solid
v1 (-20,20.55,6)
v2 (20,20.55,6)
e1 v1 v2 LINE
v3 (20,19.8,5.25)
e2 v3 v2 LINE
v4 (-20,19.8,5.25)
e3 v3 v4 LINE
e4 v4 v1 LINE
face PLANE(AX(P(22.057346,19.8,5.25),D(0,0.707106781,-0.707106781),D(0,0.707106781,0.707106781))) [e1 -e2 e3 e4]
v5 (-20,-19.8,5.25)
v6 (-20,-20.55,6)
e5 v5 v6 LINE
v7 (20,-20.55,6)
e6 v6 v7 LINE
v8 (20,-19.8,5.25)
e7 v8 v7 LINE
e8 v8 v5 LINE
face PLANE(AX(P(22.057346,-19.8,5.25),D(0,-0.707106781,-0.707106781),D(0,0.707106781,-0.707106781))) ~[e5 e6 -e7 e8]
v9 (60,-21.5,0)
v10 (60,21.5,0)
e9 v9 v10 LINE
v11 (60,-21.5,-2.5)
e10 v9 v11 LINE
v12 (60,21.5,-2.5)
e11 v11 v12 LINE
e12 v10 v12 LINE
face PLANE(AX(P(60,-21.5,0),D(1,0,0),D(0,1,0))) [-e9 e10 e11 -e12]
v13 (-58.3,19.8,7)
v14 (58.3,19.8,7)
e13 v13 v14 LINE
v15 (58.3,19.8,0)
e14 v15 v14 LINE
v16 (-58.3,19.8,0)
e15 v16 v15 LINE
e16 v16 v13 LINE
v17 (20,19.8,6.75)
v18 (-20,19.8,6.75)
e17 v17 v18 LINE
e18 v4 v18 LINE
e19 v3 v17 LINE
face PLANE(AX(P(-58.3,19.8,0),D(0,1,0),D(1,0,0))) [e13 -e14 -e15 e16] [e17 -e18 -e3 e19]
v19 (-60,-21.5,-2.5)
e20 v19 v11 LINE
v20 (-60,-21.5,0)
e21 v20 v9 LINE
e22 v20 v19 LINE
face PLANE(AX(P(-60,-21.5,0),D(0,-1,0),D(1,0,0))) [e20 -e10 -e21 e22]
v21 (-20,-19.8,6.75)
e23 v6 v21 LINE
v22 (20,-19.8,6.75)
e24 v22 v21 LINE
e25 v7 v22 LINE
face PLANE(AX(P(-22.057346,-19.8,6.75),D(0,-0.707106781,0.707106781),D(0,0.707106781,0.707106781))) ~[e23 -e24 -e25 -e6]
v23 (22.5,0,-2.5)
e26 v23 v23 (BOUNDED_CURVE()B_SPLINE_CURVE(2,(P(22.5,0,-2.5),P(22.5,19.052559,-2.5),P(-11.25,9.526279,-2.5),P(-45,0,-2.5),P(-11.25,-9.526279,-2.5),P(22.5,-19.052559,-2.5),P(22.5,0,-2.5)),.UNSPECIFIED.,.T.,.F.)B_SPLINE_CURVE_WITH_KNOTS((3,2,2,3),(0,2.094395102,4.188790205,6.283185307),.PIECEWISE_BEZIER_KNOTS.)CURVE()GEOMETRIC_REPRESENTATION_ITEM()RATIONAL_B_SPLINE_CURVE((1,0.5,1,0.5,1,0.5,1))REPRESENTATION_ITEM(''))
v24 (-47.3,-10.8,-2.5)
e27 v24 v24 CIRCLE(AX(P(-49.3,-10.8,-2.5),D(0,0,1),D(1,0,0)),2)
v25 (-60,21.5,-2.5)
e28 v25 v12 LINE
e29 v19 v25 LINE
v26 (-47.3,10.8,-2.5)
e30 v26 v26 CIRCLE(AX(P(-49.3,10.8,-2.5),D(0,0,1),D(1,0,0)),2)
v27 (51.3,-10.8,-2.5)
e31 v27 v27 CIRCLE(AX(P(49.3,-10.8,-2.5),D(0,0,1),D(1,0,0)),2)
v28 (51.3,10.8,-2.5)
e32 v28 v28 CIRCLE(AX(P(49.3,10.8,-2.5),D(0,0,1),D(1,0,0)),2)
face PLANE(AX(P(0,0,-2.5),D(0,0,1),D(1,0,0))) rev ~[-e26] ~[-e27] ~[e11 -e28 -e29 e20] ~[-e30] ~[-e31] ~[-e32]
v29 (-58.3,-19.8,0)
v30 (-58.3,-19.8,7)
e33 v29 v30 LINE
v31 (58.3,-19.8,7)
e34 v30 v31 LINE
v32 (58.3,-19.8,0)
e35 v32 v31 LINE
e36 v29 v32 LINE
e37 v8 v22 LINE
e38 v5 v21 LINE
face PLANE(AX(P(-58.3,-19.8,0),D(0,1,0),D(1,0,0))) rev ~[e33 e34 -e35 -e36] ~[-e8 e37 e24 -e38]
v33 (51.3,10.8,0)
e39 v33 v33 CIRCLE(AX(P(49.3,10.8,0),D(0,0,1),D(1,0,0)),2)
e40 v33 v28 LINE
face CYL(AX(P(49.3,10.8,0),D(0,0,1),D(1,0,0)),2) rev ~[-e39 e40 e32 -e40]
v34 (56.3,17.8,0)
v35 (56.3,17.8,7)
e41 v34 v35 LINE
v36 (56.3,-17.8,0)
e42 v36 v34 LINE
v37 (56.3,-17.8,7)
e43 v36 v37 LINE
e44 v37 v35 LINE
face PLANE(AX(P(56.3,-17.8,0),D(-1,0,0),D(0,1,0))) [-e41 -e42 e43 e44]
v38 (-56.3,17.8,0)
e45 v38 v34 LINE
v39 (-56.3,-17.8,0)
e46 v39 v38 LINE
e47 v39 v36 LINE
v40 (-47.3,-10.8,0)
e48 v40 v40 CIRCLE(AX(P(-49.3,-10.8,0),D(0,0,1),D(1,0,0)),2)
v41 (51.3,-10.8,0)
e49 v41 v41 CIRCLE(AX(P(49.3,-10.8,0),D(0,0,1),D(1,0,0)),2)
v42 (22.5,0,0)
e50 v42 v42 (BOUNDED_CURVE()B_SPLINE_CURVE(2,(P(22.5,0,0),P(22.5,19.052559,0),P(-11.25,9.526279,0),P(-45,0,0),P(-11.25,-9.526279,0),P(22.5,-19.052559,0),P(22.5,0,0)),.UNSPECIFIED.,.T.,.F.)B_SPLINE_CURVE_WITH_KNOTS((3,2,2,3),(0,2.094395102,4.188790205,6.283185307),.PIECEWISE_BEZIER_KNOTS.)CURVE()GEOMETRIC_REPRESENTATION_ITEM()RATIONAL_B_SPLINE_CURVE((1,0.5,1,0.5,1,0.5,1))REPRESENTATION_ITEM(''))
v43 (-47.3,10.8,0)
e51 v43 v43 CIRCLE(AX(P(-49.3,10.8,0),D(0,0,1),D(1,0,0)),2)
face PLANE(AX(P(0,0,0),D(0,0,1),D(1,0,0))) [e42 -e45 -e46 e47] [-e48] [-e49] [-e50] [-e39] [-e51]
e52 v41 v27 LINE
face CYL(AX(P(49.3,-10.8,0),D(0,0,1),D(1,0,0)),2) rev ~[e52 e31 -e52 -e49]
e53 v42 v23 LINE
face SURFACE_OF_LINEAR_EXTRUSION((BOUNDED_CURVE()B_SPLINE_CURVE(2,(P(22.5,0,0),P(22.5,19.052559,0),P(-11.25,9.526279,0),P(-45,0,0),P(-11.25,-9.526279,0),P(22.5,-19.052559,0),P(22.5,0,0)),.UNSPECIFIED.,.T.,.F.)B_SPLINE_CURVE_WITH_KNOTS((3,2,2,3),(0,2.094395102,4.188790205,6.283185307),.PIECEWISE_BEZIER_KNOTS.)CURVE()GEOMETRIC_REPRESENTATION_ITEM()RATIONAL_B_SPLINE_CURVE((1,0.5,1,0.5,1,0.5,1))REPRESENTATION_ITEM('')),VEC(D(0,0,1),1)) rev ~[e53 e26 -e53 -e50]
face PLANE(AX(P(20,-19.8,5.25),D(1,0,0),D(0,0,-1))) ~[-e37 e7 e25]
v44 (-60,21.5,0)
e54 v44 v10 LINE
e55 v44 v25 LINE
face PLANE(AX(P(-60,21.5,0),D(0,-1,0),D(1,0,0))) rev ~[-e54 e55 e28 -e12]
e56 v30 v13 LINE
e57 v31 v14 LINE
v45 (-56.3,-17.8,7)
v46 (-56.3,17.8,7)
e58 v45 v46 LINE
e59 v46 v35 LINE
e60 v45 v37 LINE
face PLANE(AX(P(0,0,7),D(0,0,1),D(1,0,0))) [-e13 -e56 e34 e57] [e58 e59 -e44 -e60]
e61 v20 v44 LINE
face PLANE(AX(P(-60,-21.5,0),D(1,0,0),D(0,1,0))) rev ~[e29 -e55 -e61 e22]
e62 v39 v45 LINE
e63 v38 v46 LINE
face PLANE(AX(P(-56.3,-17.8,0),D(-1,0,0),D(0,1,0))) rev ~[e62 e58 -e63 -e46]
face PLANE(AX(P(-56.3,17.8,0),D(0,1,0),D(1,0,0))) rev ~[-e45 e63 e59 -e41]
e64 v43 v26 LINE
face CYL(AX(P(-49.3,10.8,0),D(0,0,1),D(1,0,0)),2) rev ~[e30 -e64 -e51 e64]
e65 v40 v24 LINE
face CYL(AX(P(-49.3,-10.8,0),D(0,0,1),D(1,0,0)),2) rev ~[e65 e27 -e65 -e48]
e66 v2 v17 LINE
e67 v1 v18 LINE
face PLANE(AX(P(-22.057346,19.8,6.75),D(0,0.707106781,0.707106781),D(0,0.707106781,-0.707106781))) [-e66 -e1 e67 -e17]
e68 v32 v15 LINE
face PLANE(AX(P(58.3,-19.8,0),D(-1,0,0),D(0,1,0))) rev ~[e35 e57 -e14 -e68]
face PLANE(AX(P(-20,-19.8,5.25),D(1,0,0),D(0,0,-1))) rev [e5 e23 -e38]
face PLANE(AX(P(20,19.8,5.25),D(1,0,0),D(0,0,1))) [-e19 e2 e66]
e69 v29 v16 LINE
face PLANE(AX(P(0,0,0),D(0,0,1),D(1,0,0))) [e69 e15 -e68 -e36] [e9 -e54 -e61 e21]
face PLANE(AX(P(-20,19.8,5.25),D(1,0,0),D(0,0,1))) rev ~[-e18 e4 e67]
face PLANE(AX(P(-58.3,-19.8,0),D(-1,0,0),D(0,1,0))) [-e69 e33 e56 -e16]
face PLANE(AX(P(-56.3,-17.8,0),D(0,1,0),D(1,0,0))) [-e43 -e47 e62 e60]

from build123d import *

# Parameters (mm, degrees)
F0_W        = 120
F0_H        = 43
F0_W_2      = 116.6
F0_H_2      = 39.6
F0_W_3      = 112.6
F0_H_3      = 35.6
F0_R        = 2
F1_DEPTH    = 2.5
F2_DEPTH    = 7
F3_W        = 40
F3_H        = 1.5
F4_DEPTH    = 0.8
F5_T4_DEPTH = 44.1146927807
F5_T9_DEPTH = 44.1146927807


# Not quite as in the source:
# - a fillet or chamfer that OpenCascade refuses, or shapes differently, is made with other operations: its cross-section is extruded or revolved along the edge and cut away or added


with BuildPart() as f1:
    # F0 (on Top) → F1 (new body)
    with BuildSketch(Plane.XY):
        Rectangle(F0_W, F0_H)
        Rectangle(F0_W_2, F0_H_2, mode=Mode.SUBTRACT)
        Rectangle(F0_W_2, F0_H_2)
        Rectangle(F0_W_3, F0_H_3, mode=Mode.SUBTRACT)
        Rectangle(F0_W_3, F0_H_3)
        with Locations((-49.3, -10.8)):
            Circle(F0_R, mode=Mode.SUBTRACT)
        with Locations((49.3, -10.8)):
            Circle(F0_R, mode=Mode.SUBTRACT)
        with Locations((-49.3, 10.8)):
            Circle(F0_R, mode=Mode.SUBTRACT)
        with BuildLine():
            add(Edge.make_bspline(
                [(22.5, 0), (22.5, 19.0525588833), (-11.25, 9.5262794416), (-45, 0), (-11.25, -9.5262794416), (22.5, -19.0525588833), (22.5, 0)],
                knots=[0, 0, 0, 2.0943951024, 2.0943951024, 4.1887902048, 4.1887902048, 6.2831853072, 6.2831853072, 6.2831853072], degree=2, weights=[1, 0.5, 1, 0.5, 1, 0.5, 1]))
        make_face(mode=Mode.SUBTRACT)
        with Locations((49.3, 10.8)):
            Circle(F0_R, mode=Mode.SUBTRACT)
    extrude(amount=-F1_DEPTH)

    # F0 (on Top) → F2 (join)
    with BuildSketch(Plane.XY):
        Rectangle(F0_W_2, F0_H_2)
        Rectangle(F0_W_3, F0_H_3, mode=Mode.SUBTRACT)
    extrude(amount=F2_DEPTH)

    # F3 (on face) → F4 (join)
    with BuildSketch(Plane(origin=(0, 19.8, 0), x_dir=(-1, 0, 0), z_dir=(0, 1, 0))):
        with Locations((0, 6)):
            Rectangle(F3_W, F3_H)
    extrude(amount=F4_DEPTH)

    # F5: chamfer of 0.8 on 2 edges, made by hand


with BuildPart() as f5_tool2:
    # F5_s3 → F5_t4 (new body)
    with BuildSketch(Plane.YZ.offset(22.0573463904)):
        Polygon((19.8, 5.25), (20.6, 6.05), (20.6, 5.25), align=None)
    extrude(amount=-F5_T4_DEPTH)

    split(bisect_by=Plane.XZ.offset(-19.8), keep=Keep.BOTTOM)


with BuildPart() as f1_1:
    add(f1.part)

    # F5_t1: cut F5_tool2
    add(f5_tool2.part, mode=Mode.SUBTRACT)


with BuildPart() as f5_tool7:
    # F5_s8 → F5_t9 (new body)
    with BuildSketch(Plane.YZ.offset(-22.0573463904)):
        Polygon((19.8, 6.75), (20.6, 5.95), (20.6, 6.75), align=None)
    extrude(amount=F5_T9_DEPTH)

    split(bisect_by=Plane.XZ.offset(-19.8), keep=Keep.BOTTOM)


with BuildPart() as f1_2:
    add(f1_1.part)

    # F5_t6: cut F5_tool7
    add(f5_tool7.part, mode=Mode.SUBTRACT)

    # F6: F1 across plane


with BuildPart() as f1_3:
    add(f1_2.part)
    add(f1_2.part.mirror(Plane.XZ))


solid = f1_3.part
